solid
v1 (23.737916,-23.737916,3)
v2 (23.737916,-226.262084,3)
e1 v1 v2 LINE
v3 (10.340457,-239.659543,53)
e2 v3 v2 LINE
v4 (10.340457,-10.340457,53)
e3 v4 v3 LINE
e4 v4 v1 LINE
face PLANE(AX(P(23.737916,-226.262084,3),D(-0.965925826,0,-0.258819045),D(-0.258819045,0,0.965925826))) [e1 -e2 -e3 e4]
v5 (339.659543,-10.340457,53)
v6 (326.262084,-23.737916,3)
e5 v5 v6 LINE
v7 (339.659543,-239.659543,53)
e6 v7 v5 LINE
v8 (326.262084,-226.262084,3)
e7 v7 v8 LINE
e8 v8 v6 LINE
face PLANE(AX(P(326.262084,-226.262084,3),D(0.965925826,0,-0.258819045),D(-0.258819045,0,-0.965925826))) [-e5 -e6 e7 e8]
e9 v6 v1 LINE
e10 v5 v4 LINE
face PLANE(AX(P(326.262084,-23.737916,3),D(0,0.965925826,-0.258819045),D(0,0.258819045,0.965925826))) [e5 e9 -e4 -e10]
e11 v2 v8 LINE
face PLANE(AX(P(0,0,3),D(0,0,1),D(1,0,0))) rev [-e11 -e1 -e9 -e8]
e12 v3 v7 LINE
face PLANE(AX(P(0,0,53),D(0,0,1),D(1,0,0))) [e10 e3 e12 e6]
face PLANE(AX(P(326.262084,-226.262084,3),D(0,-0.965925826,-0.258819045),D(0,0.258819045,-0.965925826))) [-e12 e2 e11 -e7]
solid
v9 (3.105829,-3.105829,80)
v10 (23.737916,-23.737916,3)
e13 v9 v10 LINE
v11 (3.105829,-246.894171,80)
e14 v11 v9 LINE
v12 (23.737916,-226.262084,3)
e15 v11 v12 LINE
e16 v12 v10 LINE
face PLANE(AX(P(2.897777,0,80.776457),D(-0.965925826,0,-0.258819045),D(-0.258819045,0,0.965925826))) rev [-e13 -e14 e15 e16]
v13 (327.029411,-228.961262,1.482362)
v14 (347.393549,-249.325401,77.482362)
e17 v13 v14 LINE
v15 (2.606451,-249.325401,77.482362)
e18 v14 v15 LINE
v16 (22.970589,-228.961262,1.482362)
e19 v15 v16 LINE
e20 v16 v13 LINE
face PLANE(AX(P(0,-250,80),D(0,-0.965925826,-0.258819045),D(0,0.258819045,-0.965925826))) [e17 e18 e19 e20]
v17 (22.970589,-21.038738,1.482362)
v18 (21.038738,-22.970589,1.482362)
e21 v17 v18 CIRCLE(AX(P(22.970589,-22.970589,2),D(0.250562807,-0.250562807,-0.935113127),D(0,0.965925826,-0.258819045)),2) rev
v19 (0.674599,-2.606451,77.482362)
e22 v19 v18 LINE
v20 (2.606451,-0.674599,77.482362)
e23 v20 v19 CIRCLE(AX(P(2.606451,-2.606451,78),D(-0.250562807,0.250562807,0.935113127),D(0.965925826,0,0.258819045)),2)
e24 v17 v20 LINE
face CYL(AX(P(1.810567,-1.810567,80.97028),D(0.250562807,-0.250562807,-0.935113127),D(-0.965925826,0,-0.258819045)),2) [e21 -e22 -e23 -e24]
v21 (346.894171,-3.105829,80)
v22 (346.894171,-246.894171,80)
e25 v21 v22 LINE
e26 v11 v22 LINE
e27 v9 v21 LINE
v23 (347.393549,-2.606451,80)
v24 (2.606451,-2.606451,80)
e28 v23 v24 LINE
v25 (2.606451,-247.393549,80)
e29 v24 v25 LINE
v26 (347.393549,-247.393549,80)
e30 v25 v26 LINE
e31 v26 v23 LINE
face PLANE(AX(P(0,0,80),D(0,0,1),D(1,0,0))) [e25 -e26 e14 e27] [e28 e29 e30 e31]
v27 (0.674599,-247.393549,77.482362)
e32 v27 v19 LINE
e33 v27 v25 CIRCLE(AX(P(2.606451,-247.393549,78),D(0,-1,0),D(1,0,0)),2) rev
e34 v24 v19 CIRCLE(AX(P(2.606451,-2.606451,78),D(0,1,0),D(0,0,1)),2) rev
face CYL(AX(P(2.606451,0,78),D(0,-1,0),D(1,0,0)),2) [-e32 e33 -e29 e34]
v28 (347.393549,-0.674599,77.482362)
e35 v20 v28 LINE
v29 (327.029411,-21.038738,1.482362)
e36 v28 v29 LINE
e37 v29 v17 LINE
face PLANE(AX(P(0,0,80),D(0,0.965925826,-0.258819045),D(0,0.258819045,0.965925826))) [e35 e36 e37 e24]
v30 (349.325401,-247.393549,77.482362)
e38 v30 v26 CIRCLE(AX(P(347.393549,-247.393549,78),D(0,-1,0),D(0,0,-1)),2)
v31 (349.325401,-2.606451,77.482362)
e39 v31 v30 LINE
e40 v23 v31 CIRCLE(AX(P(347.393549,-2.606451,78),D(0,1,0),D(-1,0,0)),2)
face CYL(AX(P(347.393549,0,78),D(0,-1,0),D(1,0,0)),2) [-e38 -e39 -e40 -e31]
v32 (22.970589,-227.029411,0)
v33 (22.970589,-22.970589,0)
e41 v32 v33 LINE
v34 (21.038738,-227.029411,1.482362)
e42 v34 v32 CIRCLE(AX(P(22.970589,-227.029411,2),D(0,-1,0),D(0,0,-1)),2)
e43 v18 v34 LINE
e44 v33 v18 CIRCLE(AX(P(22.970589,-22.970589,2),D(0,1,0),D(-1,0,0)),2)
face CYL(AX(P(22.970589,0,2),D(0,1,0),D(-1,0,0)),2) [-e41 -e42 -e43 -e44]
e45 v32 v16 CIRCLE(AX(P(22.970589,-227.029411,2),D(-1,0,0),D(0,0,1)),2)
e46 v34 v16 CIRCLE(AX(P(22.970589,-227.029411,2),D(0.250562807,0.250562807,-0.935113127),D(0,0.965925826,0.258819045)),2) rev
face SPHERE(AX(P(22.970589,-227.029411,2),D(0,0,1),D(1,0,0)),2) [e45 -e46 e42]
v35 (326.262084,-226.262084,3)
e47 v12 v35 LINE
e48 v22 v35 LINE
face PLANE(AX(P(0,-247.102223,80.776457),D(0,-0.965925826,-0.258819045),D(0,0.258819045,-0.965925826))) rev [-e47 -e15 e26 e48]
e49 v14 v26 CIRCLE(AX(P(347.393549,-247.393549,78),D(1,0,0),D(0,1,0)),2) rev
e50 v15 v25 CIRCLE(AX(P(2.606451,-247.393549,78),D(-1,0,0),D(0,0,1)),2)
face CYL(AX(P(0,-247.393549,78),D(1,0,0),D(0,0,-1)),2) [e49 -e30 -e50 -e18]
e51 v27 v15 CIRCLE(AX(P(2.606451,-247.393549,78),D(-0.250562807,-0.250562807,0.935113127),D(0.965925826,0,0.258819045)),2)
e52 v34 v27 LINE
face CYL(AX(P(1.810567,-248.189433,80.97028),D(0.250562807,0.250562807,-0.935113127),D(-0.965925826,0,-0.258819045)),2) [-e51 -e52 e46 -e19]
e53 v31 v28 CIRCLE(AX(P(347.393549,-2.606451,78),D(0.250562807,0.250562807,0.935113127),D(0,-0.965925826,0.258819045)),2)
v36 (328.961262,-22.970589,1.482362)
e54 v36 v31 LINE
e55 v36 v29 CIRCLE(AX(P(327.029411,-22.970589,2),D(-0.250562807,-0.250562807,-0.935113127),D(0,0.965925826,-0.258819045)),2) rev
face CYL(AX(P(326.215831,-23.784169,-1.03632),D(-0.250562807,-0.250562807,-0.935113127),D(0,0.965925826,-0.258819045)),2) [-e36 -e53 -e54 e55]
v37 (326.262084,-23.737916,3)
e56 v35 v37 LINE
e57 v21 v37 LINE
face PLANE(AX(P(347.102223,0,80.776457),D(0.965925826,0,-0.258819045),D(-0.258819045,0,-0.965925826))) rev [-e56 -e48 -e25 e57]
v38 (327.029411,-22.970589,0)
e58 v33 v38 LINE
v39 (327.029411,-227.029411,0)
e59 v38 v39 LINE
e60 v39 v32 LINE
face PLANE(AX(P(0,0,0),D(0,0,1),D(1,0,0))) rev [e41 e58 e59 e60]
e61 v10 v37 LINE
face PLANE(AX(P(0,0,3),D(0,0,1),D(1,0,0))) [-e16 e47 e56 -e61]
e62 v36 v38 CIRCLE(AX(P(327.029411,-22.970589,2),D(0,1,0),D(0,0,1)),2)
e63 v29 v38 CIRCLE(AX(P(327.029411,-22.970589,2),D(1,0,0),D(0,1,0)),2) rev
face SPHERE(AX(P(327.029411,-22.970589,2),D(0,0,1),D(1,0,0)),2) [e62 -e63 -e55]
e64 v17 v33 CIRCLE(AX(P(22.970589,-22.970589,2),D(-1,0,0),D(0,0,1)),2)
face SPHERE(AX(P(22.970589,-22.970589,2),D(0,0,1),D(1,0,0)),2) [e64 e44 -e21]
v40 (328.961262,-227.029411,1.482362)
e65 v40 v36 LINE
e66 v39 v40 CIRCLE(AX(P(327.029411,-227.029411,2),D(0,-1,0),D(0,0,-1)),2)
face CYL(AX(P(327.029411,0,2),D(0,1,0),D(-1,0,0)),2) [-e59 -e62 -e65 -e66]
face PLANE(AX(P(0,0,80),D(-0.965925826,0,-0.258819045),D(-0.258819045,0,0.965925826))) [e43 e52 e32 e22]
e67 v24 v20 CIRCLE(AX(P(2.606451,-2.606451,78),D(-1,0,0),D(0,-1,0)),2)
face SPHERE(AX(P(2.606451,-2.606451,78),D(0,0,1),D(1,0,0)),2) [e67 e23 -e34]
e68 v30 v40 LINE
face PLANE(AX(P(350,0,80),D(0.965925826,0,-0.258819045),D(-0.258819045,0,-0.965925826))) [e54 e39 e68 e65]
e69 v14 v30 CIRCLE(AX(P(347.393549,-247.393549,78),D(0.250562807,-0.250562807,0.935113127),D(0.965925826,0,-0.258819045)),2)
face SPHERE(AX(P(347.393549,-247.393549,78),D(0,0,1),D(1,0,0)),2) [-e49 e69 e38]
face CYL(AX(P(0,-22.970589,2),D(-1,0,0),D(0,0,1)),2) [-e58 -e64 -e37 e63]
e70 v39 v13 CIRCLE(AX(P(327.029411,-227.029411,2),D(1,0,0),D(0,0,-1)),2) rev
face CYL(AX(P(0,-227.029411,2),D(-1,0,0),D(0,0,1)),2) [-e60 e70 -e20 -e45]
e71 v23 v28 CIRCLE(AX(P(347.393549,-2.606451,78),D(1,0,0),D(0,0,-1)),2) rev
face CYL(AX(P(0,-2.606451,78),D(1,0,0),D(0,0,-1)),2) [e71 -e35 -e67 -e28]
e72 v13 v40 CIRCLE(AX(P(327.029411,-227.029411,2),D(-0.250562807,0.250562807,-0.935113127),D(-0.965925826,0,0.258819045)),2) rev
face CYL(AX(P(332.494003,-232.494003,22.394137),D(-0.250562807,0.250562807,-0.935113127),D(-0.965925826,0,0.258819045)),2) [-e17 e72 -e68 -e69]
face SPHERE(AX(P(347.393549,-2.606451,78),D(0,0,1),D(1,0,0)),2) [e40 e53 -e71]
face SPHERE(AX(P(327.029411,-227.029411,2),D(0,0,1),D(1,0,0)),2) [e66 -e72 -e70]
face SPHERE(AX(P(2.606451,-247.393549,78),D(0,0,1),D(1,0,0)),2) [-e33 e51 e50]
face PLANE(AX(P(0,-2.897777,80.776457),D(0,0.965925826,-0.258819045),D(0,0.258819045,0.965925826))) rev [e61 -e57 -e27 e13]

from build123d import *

# Parameters (mm, degrees)
SKETCH_1_W        = 350
SKETCH_1_H        = 250
EXTRUDE_1_DEPTH   = 80
DRAFT_3_ANGLE     = -15
FILLET_1_R        = 2
SHELL_8_OUTLINE_W = 302.524167284
SHELL_8_OUTLINE_H = 202.524167284
SHELL_8_DEPTH     = 77
SHELL_8_DRAFT     = -15
SKETCH_4_W        = 302.524167284
SKETCH_4_H        = 202.524167284
EXTRUDE_3_DEPTH   = 50
EXTRUDE_3_DRAFT   = -15


# Read off the part's stored shape, not the designer's step: 쉘8
with BuildPart() as part:
    # 스케치1 → 보스-돌출1 (new body)
    with BuildSketch(Plane.XY):
        with Locations((175, -125)):
            Rectangle(SKETCH_1_W, SKETCH_1_H)
    extrude(amount=EXTRUDE_1_DEPTH)

    # 구배3
    draft_3_faces = [part.faces().sort_by_distance(p)[0] for p in [
        (350, -125, 40),
        (175, -250, 40),
        (0, -125, 40),
        (175, 0, 40),
    ]]
    draft(draft_3_faces, Plane.XY.offset(80), DRAFT_3_ANGLE)

    # 필렛1
    fillet_1_edges = [part.edges().sort_by_distance(p)[0] for p in [
        (350, -125, 80),
        (175, 0, 80),
        (0, -125, 80),
        (175, -21.435935394, 0),
        (328.564064606, -125, 0),
        (175, -228.564064606, 0),
        (21.435935394, -125, 0),
        (175, -250, 80),
        (10.717967697, -10.717967697, 40),
        (339.282032303, -10.717967697, 40),
        (339.282032303, -239.282032303, 40),
        (10.717967697, -239.282032303, 40),
    ]]
    fillet(fillet_1_edges, radius=FILLET_1_R)


with BuildPart() as shell_8_tool:
    # 쉘8 outline → 쉘8 (with draft: the straight prism first)
    with BuildSketch(Plane.XY.offset(3)):
        with Locations((175, -125)):
            Rectangle(SHELL_8_OUTLINE_W, SHELL_8_OUTLINE_H)
    extrude(amount=SHELL_8_DEPTH)
    # 쉘8: the draft: its side faces are tilted about the plane it starts from
    shell_8_sides = [shell_8_tool.faces().sort_by_distance(p)[0] for p in [
        (175, -226.262083642, 41.5),
        (326.262083642, -125, 41.5),
        (175, -23.737916358, 41.5),
        (23.737916358, -125, 41.5),
    ]]
    draft(shell_8_sides, Plane.XY.offset(3), SHELL_8_DRAFT)


with BuildPart() as part_1:
    add(part.part)

    # 쉘8: cut by shell_8_tool
    add(shell_8_tool.part, mode=Mode.SUBTRACT)


with BuildPart() as body_2:
    # 스케치4 → 보스-돌출3 (with draft: the straight prism first)
    with BuildSketch(Plane.XY.offset(3)):
        with Locations((175, -125)):
            Rectangle(SKETCH_4_W, SKETCH_4_H)
    extrude(amount=EXTRUDE_3_DEPTH)
    # 보스-돌출3: the draft: its side faces are tilted about the plane it starts from
    extrude_3_sides = [body_2.faces().sort_by_distance(p)[0] for p in [
        (326.262083642, -125, 28),
        (175, -23.737916358, 28),
        (23.737916358, -125, 28),
        (175, -226.262083642, 28),
    ]]
    draft(extrude_3_sides, Plane.XY.offset(3), EXTRUDE_3_DRAFT)


solid = Compound([part_1.part, body_2.part])
